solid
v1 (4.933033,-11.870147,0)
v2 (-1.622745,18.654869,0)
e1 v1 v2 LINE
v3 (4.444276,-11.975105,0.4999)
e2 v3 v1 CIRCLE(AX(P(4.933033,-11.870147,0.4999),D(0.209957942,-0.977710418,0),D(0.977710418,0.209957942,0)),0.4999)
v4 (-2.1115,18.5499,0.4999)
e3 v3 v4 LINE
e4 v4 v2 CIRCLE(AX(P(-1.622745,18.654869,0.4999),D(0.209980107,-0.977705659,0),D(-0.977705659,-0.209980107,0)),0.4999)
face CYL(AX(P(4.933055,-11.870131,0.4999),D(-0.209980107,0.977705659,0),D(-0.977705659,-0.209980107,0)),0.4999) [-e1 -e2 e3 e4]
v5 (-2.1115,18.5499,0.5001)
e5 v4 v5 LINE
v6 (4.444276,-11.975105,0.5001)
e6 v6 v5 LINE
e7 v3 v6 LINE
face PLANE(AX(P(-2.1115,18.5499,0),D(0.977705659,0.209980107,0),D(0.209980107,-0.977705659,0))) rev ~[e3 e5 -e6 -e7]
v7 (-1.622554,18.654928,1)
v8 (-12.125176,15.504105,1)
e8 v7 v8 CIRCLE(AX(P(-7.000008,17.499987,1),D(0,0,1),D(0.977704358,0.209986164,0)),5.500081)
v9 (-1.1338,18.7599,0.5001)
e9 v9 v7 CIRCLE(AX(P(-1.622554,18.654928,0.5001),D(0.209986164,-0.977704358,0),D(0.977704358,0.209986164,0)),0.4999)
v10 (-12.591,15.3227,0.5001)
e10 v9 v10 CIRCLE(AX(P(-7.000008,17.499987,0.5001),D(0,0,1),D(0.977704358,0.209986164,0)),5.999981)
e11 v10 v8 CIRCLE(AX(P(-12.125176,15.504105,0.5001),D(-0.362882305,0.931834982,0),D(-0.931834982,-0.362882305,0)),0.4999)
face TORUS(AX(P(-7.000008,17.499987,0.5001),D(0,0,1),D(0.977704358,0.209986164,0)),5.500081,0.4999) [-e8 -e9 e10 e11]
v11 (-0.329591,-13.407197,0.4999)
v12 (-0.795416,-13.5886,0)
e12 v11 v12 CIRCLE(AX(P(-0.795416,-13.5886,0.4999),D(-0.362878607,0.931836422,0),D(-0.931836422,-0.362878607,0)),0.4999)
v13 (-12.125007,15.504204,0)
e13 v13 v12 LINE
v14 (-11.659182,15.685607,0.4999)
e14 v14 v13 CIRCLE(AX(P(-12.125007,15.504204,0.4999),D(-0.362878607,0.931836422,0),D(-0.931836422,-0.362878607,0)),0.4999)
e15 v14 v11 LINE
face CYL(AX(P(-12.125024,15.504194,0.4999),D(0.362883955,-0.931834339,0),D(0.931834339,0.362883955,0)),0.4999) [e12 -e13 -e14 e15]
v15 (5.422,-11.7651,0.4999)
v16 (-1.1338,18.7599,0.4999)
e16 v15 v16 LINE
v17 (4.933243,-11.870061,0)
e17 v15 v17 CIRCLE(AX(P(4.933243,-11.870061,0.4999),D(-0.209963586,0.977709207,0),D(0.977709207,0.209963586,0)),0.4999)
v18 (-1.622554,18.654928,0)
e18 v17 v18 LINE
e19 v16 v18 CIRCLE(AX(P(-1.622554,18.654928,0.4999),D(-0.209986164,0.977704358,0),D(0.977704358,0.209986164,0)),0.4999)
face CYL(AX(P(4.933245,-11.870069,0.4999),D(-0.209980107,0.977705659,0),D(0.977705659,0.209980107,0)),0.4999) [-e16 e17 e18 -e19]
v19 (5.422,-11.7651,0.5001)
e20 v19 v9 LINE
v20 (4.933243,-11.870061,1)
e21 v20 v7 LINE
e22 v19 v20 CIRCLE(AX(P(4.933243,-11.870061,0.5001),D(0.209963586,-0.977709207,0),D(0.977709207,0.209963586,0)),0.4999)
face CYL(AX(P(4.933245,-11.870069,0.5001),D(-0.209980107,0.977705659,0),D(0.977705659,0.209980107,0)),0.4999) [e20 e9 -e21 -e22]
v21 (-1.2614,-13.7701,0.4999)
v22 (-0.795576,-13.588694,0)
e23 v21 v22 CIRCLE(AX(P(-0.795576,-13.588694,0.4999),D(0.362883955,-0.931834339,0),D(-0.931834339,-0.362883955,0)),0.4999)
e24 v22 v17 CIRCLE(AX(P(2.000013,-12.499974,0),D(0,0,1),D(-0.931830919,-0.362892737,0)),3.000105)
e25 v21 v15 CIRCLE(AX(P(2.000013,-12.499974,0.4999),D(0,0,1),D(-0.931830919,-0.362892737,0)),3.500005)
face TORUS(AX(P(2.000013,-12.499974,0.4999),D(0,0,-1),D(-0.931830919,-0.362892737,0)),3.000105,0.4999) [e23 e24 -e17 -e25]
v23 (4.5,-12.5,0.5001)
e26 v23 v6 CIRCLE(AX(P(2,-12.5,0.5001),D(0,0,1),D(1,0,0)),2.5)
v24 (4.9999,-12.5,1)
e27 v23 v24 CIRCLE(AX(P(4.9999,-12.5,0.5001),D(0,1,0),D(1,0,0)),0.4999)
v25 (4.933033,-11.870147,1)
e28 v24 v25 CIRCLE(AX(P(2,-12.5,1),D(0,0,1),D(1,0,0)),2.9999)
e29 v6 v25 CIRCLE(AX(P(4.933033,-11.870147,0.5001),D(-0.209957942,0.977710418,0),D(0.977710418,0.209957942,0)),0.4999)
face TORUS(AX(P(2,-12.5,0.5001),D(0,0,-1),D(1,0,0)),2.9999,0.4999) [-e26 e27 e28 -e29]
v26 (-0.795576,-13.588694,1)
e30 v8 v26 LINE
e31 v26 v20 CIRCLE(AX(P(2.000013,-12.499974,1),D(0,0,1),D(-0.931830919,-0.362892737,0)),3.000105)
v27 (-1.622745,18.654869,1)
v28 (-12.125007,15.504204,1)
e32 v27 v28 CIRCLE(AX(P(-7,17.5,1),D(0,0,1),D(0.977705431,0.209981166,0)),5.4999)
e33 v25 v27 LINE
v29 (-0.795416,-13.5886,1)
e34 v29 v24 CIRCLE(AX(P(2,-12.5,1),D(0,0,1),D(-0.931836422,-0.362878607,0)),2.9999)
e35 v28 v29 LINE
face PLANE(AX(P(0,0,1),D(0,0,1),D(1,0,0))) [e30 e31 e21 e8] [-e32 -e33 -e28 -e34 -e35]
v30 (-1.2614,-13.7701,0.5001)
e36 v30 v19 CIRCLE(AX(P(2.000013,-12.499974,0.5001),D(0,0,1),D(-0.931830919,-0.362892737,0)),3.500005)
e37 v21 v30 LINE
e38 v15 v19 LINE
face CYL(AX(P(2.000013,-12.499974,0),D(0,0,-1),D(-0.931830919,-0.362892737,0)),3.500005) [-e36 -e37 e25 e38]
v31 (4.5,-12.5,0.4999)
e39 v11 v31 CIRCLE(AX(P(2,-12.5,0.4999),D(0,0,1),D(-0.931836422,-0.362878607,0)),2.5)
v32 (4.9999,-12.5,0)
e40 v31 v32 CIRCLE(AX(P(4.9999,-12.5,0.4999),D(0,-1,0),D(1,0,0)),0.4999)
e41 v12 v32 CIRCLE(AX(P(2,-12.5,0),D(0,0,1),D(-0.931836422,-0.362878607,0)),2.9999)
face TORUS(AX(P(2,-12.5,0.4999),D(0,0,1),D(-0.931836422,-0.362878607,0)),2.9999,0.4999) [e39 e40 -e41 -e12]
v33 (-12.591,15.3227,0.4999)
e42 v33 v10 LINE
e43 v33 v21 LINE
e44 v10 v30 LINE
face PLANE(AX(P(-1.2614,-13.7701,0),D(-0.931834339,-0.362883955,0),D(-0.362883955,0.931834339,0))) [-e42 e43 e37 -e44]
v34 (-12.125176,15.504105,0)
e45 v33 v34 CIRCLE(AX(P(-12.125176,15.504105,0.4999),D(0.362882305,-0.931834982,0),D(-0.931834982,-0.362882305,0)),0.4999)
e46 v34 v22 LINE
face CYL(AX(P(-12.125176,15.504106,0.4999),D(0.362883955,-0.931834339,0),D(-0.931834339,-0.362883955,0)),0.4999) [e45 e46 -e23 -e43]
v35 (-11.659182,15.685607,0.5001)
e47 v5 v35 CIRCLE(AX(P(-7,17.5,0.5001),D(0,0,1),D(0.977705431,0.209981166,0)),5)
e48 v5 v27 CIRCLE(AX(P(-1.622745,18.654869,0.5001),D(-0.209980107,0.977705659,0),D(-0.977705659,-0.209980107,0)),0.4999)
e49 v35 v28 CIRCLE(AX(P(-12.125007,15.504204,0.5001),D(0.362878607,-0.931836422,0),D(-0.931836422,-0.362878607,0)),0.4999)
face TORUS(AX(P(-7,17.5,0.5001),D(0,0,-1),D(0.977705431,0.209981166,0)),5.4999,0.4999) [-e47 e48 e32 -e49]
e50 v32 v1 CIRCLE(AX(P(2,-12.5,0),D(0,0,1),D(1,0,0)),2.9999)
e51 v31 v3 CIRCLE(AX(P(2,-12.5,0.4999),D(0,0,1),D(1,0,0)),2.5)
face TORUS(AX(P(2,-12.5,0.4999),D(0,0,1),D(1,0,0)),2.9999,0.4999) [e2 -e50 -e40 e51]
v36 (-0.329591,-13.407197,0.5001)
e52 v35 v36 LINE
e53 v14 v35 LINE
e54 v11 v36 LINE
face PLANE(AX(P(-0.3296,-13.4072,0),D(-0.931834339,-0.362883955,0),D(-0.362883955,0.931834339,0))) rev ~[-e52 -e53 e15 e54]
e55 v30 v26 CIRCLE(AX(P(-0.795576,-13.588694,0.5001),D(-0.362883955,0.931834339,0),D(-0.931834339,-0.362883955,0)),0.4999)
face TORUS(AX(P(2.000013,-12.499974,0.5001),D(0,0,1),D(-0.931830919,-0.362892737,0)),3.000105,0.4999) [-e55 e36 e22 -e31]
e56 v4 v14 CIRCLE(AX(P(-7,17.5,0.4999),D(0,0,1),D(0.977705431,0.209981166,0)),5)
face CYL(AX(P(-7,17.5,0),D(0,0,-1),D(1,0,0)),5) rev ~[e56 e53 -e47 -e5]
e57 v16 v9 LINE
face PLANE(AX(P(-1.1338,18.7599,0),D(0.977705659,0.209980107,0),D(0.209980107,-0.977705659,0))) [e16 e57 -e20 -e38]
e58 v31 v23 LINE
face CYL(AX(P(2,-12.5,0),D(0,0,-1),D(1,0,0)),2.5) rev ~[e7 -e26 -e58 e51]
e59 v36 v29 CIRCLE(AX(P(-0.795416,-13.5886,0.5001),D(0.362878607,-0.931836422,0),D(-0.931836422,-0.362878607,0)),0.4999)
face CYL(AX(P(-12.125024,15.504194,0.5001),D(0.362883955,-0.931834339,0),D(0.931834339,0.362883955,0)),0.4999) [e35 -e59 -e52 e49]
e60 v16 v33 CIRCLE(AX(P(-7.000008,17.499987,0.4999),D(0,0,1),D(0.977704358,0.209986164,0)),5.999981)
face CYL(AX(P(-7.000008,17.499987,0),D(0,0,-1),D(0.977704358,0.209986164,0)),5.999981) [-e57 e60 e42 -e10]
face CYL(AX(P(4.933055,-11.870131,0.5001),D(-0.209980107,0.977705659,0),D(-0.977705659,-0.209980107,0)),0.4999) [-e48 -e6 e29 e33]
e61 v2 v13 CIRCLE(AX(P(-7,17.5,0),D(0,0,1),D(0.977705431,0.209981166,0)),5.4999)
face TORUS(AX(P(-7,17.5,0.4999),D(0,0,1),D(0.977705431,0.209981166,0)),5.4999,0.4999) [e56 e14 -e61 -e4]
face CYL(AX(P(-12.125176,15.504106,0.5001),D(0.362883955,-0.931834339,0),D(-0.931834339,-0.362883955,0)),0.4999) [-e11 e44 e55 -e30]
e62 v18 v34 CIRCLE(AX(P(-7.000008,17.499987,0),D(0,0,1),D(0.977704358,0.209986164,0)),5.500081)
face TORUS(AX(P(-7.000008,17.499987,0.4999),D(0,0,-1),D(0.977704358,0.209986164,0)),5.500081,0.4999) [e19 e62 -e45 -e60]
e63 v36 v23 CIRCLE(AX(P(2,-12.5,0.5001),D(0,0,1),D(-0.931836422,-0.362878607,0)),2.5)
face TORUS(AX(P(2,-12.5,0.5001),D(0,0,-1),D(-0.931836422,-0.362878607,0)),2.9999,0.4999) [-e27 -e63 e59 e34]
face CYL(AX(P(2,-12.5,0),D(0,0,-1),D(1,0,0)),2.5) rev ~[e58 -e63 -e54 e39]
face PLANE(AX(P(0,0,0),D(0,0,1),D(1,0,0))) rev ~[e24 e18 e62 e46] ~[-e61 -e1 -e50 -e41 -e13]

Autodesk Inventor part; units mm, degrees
ref_plane "YZ Plane" through (0, 0, 0) normal (1, 0, 0) x (0, 1, 0)
ref_plane "XZ Plane" through (0, 0, 0) normal (0, 1, 0) x (-1, 0, 0)
ref_plane "XY Plane" through (0, 0, 0) normal (0, 0, 1) x (1, 0, 0)
sketch "スケッチ1" plane through (0, 0, 0) normal (0, 0, 1) x (1, 0, 0)
  circle A0 centre (2, -12.5) radius 2.5 projected
  circle A1 centre (-7, 17.5) radius 5 projected
  line L0 (-2.1115, 18.5499) -> (4.4443, -11.9751)
  line L1 (-0.3296, -13.4072) -> (-11.6592, 15.6856)
  arc A2 (-1.1338, 18.7599) -> (-12.591, 15.3227) centre (-7, 17.5) ccw
  arc A3 (-1.2614, -13.7701) -> (5.422, -11.7651) centre (2, -12.5) ccw
  line L2 (-1.1338, 18.7599) -> (5.422, -11.7651)
  line L3 (-1.2614, -13.7701) -> (-12.591, 15.3227)
  point P0 (0, 0)
  dimension "d0" = 1
  dimension "d1" = 1
extrude "押し出し1" add sketch "スケッチ1" along normal blind 1
fillet "フィレット1" radius 0.5 16 edges at (2.7184, -14.8946, 1) (-5.9944, 1.1392, 1) (-8.4367, 22.2891, 1) (1.1664, 3.2874, 1) (-8.7241, 23.247, 1) (-6.9262, 0.7763, 1) (3.0057, -15.8524, 1) (2.1441, 3.4974, 1) (-8.7241, 23.247, 0) (-6.9262, 0.7763, 0) (3.0057, -15.8524, 0) (2.1441, 3.4974, 0) (2.7184, -14.8946, 0) (-5.9944, 1.1392, 0) (-8.4367, 22.2891, 0) (1.1664, 3.2874, 0)
properties part number "Belt"
